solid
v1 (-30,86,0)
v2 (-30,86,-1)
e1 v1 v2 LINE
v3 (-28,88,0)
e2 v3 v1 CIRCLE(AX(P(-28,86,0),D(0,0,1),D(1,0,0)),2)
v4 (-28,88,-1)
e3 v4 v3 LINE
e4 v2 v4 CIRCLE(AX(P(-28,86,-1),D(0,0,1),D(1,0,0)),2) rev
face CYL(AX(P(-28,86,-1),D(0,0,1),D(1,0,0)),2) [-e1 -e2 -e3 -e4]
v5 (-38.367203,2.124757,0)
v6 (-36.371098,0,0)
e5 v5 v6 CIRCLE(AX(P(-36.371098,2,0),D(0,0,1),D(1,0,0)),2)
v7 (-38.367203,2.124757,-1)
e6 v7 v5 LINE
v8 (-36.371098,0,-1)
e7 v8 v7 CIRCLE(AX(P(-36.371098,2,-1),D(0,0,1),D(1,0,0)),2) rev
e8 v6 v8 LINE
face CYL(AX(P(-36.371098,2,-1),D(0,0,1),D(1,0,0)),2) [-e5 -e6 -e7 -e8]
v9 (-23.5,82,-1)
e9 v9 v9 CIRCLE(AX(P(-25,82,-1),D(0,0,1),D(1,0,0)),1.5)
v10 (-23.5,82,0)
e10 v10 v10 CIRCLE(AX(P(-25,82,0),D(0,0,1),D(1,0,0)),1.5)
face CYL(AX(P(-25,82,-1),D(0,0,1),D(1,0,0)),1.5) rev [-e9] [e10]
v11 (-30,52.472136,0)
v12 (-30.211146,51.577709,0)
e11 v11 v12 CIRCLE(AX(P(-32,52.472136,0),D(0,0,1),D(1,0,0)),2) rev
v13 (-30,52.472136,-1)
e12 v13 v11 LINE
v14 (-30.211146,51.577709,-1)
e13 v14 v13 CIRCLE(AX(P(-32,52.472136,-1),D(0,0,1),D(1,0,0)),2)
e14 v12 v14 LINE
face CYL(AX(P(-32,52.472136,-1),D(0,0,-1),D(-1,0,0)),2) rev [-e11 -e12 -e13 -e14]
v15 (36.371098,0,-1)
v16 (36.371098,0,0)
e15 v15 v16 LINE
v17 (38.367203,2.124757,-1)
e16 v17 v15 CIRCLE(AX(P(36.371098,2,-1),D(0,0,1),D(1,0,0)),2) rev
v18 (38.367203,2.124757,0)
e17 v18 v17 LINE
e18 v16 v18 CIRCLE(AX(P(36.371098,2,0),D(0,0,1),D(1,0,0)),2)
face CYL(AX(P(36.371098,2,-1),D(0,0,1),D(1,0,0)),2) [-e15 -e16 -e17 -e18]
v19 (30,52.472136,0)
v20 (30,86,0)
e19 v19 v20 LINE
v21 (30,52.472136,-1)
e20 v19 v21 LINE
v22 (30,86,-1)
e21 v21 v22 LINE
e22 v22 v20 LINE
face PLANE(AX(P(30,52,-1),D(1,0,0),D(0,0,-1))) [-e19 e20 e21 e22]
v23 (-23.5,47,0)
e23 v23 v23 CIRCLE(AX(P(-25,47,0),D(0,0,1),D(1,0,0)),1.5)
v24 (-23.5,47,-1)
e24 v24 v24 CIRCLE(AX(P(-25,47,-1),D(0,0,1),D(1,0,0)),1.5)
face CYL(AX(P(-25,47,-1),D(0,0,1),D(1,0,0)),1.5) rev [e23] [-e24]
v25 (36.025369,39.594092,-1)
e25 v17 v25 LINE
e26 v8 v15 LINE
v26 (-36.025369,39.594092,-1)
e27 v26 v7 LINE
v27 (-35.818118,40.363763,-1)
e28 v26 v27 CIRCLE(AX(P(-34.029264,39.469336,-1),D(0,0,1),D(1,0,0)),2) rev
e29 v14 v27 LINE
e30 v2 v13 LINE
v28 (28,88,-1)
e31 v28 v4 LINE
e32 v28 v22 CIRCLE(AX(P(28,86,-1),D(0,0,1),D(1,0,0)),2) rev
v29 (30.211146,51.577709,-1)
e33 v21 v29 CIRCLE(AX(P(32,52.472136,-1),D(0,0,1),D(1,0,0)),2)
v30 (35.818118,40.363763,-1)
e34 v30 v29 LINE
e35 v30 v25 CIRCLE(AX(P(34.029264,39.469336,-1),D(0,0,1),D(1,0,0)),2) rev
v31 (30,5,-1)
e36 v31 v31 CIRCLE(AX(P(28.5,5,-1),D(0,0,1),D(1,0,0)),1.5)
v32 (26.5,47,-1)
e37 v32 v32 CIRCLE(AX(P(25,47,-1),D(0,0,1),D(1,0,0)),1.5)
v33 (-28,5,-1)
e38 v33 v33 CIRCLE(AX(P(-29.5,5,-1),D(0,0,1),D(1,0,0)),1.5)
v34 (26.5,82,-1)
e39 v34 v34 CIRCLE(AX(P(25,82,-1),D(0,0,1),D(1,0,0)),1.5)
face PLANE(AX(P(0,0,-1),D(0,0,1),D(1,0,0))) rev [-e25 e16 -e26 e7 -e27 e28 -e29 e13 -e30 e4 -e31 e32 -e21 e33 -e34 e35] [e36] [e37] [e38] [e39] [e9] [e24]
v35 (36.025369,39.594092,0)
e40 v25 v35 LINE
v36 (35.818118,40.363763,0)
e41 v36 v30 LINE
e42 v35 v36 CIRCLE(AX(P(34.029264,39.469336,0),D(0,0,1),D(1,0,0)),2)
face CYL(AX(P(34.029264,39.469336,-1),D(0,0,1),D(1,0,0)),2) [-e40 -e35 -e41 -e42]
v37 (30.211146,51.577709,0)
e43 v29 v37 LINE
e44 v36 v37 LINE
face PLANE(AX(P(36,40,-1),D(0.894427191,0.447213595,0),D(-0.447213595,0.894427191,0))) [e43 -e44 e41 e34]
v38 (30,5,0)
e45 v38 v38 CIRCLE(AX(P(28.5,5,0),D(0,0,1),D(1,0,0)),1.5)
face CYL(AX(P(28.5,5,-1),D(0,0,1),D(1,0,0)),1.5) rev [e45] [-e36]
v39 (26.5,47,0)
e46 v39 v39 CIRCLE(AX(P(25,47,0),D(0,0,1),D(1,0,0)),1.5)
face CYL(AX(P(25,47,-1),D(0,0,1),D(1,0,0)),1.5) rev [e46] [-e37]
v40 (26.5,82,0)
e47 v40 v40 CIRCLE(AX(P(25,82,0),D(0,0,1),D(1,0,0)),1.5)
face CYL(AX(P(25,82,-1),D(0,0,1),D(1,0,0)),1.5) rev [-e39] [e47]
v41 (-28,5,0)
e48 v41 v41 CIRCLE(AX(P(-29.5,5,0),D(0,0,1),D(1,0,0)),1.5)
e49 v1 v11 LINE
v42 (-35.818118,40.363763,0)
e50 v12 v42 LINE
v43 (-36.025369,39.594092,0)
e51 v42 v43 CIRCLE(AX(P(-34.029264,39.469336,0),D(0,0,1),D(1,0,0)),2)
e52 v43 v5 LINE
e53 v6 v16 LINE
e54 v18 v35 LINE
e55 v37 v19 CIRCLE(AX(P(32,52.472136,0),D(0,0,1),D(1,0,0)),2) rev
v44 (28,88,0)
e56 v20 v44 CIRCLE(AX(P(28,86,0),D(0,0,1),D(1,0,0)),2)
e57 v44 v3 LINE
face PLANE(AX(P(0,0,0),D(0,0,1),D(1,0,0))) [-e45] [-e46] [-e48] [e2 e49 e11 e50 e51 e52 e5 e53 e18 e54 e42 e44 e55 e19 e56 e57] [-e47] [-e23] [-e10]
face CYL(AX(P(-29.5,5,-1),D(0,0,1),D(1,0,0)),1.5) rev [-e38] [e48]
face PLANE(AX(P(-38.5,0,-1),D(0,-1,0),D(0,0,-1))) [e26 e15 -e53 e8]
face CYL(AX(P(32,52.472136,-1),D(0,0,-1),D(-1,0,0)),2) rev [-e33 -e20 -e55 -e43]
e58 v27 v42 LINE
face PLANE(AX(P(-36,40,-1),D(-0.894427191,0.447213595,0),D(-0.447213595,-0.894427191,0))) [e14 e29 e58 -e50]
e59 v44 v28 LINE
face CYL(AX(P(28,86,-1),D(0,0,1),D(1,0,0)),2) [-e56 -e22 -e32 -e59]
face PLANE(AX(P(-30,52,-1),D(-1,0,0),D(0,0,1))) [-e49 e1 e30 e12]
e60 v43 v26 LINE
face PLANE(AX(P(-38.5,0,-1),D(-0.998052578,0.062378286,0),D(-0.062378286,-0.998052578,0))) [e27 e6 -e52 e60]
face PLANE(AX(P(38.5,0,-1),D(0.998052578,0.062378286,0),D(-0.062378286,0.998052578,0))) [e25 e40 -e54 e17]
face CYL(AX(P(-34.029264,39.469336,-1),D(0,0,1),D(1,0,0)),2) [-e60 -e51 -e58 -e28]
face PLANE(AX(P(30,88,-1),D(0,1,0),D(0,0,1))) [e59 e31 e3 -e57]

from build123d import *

# Parameters (mm, degrees)
BASE_FLANGE1_DEPTH = 1
FILLET1_R          = 2
SKETCH6_R          = 1.5
CUT_EXTRUDE1_DEPTH = 97.006984786


# Sheet-metal steps are written as plain solids
with BuildPart() as part:
    # Sketch1 → Base-Flange1 (new body)
    with BuildSketch(Plane.XY):
        Polygon((-38.5, 0), (38.5, 0), (36, 40), (30, 52), (30, 88), (-30, 88), (-30, 52), (-36, 40), align=None)
    extrude(amount=-BASE_FLANGE1_DEPTH)

    # Fillet1
    fillet1_edges = [part.edges().sort_by_distance(p)[0] for p in [
        (38.5, 0, -0.5),
        (-38.5, 0, -0.5),
        (-36, 40, -0.5),
        (-30, 52, -0.5),
        (-30, 88, -0.5),
        (30, 88, -0.5),
        (30, 52, -0.5),
        (36, 40, -0.5),
    ]]
    fillet(fillet1_edges, radius=FILLET1_R)

    # Sketch6 → Cut-Extrude1 (cut, through all)
    with BuildSketch(Plane.XY):
        with Locations((-25, 82)):
            Circle(SKETCH6_R)
        with Locations((25, 82)):
            Circle(SKETCH6_R)
        with Locations((-25, 47)):
            Circle(SKETCH6_R)
        with Locations((25, 47)):
            Circle(SKETCH6_R)
        with Locations((-29.5, 5)):
            Circle(SKETCH6_R)
        with Locations((28.5, 5)):
            Circle(SKETCH6_R)
    extrude(amount=-CUT_EXTRUDE1_DEPTH, mode=Mode.SUBTRACT)


solid = part.part
